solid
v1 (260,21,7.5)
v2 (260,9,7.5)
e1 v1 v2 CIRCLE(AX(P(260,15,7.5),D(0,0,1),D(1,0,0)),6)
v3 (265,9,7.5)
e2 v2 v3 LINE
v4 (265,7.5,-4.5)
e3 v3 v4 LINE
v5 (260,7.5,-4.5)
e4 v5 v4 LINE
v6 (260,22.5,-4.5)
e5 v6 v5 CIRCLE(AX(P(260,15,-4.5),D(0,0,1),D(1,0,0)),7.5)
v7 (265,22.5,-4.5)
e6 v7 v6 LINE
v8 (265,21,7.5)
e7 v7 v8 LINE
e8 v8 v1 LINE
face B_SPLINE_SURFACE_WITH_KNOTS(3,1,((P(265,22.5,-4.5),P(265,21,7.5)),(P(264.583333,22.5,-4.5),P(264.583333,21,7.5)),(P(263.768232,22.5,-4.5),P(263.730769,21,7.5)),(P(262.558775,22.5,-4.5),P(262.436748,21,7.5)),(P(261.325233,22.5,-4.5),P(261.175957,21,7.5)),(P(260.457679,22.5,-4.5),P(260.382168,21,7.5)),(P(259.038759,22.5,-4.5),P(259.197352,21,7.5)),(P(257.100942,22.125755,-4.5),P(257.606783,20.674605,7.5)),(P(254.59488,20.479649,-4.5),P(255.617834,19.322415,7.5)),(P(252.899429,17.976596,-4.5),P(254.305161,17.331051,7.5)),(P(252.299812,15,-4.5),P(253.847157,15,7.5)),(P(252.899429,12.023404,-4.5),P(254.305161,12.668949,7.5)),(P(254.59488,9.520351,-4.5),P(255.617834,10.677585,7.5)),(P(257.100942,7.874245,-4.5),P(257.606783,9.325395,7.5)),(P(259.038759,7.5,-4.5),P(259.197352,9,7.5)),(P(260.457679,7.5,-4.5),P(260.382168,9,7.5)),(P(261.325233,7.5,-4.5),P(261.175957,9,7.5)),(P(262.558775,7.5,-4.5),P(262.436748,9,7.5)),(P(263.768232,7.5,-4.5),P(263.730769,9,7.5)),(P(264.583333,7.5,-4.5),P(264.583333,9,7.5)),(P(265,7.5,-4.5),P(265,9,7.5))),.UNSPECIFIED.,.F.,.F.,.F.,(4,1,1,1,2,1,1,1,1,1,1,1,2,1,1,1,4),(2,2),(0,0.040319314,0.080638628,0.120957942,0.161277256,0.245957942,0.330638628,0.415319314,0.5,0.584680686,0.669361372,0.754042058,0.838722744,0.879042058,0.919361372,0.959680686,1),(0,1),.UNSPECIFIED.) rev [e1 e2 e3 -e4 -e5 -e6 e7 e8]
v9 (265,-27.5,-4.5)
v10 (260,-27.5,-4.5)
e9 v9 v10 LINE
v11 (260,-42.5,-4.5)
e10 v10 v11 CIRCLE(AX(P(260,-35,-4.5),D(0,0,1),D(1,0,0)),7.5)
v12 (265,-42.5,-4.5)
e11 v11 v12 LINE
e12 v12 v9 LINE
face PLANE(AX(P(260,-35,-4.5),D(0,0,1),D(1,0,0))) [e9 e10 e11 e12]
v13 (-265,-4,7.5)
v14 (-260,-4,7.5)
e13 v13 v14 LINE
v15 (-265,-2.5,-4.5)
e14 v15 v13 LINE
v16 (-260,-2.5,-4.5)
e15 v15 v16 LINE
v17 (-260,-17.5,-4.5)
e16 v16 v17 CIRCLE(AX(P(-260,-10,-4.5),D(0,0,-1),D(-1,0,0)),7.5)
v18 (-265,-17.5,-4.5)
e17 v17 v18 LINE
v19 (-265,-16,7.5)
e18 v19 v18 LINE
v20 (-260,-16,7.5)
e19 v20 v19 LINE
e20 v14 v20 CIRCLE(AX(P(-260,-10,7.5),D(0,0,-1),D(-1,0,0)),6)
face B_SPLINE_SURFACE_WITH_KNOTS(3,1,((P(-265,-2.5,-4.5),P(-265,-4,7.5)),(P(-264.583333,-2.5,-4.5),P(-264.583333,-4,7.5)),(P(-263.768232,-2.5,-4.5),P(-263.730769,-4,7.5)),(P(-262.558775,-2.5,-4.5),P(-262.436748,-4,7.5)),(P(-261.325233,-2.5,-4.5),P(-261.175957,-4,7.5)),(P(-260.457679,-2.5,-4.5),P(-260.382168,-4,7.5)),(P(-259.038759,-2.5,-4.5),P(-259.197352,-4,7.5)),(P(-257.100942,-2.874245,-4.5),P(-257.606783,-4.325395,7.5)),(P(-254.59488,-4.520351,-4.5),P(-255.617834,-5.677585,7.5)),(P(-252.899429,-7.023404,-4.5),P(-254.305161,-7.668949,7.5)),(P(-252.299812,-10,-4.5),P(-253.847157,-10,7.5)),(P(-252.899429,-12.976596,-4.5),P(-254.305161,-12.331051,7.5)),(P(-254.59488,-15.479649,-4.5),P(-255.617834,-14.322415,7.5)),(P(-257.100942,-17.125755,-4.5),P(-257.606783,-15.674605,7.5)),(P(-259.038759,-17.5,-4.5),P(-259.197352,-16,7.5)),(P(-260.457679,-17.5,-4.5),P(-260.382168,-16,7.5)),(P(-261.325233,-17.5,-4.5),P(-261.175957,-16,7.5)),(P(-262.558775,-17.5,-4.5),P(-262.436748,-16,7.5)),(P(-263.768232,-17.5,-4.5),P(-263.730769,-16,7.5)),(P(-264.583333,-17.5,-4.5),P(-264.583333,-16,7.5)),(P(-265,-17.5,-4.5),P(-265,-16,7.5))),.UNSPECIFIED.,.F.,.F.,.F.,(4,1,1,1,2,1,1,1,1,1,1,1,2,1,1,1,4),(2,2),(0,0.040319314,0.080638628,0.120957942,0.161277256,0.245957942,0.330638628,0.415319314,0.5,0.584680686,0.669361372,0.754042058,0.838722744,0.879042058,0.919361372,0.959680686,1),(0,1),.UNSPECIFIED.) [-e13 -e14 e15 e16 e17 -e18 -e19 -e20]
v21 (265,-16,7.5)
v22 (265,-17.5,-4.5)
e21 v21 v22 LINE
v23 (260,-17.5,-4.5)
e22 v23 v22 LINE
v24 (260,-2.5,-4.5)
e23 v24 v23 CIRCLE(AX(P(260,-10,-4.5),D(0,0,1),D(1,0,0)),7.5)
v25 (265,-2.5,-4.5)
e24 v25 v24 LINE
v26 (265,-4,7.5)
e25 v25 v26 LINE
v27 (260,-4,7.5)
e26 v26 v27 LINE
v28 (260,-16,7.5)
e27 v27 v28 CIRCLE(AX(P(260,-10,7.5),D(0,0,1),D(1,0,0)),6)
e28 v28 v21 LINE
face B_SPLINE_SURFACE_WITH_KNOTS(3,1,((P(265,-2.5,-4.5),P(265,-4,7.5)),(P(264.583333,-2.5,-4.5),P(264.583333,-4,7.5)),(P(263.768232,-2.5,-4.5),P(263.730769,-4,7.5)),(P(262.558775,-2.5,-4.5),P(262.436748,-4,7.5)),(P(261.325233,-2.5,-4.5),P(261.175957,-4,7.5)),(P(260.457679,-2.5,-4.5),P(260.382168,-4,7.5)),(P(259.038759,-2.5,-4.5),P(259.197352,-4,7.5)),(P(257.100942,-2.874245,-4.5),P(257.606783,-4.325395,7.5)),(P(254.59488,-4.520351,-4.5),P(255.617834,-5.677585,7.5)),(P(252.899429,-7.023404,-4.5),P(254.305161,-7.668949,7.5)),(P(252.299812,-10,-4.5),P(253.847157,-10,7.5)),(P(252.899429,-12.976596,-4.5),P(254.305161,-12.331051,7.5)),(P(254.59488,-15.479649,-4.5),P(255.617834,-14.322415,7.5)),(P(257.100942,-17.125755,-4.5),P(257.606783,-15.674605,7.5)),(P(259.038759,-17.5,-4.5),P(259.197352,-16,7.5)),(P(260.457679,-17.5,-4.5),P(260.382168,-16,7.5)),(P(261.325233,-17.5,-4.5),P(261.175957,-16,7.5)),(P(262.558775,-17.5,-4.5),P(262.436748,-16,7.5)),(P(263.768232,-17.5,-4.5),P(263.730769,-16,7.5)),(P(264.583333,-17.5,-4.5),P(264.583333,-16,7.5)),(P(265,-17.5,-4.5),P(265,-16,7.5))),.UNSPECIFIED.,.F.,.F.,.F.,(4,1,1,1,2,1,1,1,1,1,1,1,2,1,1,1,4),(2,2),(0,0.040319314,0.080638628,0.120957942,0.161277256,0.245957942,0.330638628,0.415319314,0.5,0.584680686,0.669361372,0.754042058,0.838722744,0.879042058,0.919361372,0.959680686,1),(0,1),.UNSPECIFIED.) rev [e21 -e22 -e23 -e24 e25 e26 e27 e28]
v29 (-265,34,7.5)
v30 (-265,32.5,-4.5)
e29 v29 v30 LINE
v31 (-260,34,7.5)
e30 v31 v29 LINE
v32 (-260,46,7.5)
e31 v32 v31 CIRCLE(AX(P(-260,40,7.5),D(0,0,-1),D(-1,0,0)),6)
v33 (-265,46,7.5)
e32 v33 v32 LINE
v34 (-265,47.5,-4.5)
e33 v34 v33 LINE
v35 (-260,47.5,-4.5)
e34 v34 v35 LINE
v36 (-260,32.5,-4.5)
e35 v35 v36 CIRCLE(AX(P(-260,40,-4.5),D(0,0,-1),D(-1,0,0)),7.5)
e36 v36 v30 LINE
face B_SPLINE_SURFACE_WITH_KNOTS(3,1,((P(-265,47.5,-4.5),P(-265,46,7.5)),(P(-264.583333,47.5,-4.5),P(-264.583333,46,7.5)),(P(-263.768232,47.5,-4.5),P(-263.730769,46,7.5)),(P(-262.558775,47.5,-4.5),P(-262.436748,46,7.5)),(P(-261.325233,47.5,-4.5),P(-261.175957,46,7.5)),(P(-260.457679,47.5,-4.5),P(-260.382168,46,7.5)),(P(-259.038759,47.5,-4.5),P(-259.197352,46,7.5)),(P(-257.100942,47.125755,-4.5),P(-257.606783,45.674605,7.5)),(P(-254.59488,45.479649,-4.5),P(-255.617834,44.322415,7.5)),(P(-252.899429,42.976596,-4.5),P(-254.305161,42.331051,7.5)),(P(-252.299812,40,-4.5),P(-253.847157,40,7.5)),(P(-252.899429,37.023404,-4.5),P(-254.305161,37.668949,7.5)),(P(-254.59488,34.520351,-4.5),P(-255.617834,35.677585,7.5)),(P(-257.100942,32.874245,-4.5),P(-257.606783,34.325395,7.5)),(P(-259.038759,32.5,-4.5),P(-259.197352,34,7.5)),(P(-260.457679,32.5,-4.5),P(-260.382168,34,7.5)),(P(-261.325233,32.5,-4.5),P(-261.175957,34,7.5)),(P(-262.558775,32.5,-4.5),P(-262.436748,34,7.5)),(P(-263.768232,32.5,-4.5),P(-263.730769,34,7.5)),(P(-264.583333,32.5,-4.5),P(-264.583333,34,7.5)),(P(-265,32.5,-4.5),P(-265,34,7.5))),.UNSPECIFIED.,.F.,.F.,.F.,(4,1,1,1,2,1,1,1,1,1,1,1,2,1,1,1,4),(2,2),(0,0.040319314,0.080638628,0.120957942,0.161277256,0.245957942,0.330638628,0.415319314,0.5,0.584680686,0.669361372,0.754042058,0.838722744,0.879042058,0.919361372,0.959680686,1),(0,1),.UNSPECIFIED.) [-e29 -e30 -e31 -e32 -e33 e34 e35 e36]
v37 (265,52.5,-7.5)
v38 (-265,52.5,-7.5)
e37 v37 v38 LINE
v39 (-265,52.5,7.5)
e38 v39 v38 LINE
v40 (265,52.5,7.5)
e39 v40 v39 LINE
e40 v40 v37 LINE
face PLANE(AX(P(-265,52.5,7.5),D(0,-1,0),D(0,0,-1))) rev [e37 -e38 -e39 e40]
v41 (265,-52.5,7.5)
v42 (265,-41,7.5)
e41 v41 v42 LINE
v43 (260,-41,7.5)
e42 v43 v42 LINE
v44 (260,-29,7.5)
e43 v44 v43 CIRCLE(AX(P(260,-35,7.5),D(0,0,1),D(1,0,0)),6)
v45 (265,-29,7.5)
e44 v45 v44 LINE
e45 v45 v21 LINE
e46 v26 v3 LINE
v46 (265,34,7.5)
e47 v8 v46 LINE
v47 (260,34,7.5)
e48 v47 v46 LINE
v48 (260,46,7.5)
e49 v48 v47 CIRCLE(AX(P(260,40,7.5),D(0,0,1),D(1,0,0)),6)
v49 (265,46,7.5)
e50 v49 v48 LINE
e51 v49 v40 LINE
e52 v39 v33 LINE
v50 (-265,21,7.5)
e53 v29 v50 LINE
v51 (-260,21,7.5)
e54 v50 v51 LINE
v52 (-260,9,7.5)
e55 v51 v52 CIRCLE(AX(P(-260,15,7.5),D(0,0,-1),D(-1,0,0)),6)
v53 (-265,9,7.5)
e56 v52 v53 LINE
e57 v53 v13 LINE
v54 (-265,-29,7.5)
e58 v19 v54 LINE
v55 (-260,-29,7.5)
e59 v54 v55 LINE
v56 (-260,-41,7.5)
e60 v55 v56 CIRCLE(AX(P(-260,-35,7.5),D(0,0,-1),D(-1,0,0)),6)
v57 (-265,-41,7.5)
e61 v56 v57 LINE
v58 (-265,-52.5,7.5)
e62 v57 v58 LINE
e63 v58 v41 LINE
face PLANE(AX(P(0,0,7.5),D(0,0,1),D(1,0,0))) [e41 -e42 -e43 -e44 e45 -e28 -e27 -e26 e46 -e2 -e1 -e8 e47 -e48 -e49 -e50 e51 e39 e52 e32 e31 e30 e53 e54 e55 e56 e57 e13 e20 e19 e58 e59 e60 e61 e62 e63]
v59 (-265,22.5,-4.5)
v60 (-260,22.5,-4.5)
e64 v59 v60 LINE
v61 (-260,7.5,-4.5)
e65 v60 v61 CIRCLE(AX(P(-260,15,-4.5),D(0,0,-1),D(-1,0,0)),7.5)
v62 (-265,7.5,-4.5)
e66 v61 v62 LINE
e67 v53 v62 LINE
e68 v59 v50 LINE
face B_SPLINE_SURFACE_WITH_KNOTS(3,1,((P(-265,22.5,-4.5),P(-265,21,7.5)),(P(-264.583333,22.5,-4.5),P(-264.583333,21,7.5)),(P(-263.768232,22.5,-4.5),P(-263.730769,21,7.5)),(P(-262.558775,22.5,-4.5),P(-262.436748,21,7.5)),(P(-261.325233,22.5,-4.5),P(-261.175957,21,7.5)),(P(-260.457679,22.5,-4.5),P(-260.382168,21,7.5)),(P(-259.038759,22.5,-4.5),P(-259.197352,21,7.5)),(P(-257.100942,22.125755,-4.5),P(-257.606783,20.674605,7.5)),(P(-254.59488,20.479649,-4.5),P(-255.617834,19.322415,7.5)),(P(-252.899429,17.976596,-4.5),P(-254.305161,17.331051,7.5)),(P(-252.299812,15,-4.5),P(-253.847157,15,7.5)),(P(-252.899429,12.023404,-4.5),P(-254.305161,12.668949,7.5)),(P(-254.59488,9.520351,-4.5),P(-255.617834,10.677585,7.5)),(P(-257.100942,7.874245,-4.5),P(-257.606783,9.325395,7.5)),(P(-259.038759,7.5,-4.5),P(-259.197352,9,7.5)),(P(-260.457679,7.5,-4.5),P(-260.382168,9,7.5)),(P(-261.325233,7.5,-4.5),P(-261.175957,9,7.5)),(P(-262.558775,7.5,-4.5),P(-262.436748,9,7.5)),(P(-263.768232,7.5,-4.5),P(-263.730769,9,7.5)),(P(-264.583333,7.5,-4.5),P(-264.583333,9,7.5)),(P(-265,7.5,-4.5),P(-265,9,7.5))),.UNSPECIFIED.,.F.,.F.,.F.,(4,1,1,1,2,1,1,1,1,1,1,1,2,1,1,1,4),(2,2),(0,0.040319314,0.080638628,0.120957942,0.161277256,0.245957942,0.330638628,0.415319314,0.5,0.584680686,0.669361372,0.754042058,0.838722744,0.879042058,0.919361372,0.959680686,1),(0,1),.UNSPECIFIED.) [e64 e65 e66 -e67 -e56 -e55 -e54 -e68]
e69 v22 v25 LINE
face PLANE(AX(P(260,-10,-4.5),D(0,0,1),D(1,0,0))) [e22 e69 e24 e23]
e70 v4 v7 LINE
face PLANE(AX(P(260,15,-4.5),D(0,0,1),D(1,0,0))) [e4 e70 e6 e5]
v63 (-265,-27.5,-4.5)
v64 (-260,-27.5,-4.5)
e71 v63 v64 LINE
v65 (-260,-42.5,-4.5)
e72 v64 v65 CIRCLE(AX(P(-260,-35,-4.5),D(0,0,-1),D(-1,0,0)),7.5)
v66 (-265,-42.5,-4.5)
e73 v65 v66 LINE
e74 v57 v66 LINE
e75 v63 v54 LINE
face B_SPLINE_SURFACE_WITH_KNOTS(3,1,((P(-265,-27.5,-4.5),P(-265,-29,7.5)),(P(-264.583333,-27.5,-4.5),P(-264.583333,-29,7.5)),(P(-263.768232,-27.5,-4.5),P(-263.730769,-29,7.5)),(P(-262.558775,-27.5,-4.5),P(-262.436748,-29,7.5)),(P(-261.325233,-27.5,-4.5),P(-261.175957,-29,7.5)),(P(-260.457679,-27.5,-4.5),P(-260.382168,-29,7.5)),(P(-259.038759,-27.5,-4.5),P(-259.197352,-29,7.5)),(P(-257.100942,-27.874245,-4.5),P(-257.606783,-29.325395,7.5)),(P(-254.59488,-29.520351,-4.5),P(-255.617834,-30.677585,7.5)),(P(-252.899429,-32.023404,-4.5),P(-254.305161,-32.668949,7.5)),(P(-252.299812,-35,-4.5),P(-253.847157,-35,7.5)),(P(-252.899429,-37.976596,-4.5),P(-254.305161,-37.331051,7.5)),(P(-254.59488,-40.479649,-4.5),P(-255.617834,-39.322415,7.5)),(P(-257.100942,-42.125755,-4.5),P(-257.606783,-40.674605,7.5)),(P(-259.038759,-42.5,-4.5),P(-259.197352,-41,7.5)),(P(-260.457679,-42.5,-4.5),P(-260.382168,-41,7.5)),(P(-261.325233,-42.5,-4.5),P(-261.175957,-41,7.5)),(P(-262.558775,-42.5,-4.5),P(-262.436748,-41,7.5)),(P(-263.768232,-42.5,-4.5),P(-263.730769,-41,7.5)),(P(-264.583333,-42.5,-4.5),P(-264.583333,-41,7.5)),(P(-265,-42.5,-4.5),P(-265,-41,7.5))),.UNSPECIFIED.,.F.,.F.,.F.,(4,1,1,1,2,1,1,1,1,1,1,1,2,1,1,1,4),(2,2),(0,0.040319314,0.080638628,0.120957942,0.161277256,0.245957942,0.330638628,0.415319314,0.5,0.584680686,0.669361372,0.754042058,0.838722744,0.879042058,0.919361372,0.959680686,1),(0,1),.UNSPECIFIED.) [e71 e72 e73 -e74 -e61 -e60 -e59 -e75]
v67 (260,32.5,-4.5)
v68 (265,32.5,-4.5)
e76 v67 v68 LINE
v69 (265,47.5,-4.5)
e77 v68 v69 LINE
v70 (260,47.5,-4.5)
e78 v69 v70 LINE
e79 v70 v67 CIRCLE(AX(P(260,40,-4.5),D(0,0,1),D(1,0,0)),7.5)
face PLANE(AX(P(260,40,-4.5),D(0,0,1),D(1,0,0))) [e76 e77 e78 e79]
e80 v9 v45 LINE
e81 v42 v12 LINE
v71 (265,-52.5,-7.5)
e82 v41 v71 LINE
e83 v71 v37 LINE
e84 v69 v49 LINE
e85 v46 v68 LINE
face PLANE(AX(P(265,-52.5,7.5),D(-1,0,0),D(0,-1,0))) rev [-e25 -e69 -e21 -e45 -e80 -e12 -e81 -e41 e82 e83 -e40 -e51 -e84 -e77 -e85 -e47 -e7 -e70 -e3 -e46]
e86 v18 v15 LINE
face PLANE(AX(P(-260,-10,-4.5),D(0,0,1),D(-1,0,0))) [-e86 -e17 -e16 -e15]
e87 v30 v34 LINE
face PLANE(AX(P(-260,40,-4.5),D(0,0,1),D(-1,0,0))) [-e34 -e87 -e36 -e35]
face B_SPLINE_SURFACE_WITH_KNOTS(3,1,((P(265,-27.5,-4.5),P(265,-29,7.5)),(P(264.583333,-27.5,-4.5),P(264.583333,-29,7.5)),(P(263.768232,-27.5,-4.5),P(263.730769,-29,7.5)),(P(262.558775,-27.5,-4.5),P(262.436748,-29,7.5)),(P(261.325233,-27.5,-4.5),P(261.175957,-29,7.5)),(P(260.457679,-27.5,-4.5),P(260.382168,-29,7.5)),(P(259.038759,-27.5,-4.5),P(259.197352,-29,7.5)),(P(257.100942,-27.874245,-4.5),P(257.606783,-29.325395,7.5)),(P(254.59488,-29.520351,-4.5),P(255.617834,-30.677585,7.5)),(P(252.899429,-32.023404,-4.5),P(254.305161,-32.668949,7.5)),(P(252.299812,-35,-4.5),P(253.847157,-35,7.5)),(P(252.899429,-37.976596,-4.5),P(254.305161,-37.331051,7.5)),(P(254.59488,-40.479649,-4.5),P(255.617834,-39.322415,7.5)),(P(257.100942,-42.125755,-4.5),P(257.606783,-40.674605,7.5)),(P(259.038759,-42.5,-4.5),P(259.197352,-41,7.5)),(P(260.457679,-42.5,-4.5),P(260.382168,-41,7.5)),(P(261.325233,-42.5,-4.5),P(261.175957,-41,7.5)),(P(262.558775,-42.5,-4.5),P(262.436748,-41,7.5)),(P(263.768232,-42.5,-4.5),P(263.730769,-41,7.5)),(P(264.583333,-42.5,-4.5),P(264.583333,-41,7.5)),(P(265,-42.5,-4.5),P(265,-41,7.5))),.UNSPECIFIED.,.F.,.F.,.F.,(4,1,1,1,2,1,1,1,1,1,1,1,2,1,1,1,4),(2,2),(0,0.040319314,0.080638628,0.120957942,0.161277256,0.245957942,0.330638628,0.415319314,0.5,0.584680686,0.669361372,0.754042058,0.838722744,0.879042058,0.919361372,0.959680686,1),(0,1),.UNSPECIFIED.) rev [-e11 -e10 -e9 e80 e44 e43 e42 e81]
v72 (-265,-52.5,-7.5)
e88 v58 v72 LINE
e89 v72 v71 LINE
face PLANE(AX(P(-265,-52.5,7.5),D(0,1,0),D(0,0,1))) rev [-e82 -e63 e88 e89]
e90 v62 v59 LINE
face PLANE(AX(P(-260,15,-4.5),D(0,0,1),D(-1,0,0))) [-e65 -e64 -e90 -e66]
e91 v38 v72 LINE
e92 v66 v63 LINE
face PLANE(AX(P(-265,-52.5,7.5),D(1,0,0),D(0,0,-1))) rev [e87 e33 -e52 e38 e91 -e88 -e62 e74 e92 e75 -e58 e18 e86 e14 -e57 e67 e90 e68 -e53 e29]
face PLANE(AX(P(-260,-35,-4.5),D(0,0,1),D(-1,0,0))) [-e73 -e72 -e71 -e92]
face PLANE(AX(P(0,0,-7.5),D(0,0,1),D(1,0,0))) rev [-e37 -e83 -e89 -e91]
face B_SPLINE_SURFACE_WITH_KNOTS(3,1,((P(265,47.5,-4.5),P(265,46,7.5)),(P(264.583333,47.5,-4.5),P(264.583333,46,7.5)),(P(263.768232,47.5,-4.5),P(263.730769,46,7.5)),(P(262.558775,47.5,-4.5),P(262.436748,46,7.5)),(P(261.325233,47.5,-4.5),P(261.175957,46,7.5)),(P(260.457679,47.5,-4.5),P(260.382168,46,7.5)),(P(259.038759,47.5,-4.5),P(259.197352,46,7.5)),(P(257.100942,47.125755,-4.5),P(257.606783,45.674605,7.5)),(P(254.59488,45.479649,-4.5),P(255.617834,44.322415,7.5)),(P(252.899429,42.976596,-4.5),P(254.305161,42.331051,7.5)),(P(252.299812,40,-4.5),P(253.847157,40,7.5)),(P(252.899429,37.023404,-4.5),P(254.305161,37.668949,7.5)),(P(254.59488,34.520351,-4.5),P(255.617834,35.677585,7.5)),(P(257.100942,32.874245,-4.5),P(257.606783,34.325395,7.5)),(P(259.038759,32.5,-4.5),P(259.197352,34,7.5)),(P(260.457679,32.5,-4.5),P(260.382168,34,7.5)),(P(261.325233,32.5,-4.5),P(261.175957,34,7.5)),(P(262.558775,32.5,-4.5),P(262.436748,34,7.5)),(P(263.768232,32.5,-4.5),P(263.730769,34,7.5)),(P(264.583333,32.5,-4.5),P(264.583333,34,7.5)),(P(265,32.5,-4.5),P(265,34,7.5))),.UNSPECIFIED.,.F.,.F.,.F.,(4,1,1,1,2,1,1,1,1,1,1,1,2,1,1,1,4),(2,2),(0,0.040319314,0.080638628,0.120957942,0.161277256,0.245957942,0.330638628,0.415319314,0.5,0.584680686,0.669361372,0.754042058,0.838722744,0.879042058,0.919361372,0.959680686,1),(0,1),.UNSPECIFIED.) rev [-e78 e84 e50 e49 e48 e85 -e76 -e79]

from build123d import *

# Parameters (mm, degrees)
SKETCH1_W           = 105
SKETCH1_H           = 530
BOSS_EXTRUDE1_DEPTH = 7.5
LPATTERN1_COUNT     = 4
LPATTERN1_PITCH     = 25


# Read off the part's stored shape, not the designer's step: Mirror1
with BuildPart() as part:
    # Sketch1 → Boss-Extrude1 (new, symmetric)
    with BuildSketch(Plane(origin=(0, 0, 0), x_dir=(0, -1, 0), z_dir=(0, 0, 1))):
        Rectangle(SKETCH1_W, SKETCH1_H)
    extrude(amount=BOSS_EXTRUDE1_DEPTH, both=True)

    # Sketch2 → Cut-Loft1 section 0
    with BuildSketch(Plane.XY.offset(-4.5)):
        with BuildLine():
            Line((265, 47.5), (265, 32.5))
            Line((265, 32.5), (260, 32.5))
            ThreePointArc((260, 32.5), (252.5, 40), (260, 47.5))
            Line((260, 47.5), (265, 47.5))
        make_face()
    # Sketch3 → Cut-Loft1 section 1
    with BuildSketch(Plane.XY.offset(7.5)):
        with BuildLine():
            Line((265, 46), (265, 34))
            Line((265, 34), (260, 34))
            ThreePointArc((260, 34), (254, 40), (260, 46))
            Line((260, 46), (265, 46))
        make_face()
    cut_loft1 = loft(mode=Mode.SUBTRACT)

    # LPattern1: Cut-Loft1 ×4
    with Locations(*[(0, -i * LPATTERN1_PITCH, 0) for i in range(1, LPATTERN1_COUNT)]):
        add(cut_loft1, mode=Mode.SUBTRACT)

    # Mirror1
    split(bisect_by=Plane(origin=(0, 0, 0), x_dir=(0, 0, 1), z_dir=(1, 0, 0)), keep=Keep.TOP)

    # Mirror1 2: part across plane


with BuildPart() as part_1:
    add(part.part)
    add(part.part.mirror(Plane(origin=(0, 0, 0), x_dir=(0, 0, 1), z_dir=(1, 0, 0))))


solid = part_1.part
